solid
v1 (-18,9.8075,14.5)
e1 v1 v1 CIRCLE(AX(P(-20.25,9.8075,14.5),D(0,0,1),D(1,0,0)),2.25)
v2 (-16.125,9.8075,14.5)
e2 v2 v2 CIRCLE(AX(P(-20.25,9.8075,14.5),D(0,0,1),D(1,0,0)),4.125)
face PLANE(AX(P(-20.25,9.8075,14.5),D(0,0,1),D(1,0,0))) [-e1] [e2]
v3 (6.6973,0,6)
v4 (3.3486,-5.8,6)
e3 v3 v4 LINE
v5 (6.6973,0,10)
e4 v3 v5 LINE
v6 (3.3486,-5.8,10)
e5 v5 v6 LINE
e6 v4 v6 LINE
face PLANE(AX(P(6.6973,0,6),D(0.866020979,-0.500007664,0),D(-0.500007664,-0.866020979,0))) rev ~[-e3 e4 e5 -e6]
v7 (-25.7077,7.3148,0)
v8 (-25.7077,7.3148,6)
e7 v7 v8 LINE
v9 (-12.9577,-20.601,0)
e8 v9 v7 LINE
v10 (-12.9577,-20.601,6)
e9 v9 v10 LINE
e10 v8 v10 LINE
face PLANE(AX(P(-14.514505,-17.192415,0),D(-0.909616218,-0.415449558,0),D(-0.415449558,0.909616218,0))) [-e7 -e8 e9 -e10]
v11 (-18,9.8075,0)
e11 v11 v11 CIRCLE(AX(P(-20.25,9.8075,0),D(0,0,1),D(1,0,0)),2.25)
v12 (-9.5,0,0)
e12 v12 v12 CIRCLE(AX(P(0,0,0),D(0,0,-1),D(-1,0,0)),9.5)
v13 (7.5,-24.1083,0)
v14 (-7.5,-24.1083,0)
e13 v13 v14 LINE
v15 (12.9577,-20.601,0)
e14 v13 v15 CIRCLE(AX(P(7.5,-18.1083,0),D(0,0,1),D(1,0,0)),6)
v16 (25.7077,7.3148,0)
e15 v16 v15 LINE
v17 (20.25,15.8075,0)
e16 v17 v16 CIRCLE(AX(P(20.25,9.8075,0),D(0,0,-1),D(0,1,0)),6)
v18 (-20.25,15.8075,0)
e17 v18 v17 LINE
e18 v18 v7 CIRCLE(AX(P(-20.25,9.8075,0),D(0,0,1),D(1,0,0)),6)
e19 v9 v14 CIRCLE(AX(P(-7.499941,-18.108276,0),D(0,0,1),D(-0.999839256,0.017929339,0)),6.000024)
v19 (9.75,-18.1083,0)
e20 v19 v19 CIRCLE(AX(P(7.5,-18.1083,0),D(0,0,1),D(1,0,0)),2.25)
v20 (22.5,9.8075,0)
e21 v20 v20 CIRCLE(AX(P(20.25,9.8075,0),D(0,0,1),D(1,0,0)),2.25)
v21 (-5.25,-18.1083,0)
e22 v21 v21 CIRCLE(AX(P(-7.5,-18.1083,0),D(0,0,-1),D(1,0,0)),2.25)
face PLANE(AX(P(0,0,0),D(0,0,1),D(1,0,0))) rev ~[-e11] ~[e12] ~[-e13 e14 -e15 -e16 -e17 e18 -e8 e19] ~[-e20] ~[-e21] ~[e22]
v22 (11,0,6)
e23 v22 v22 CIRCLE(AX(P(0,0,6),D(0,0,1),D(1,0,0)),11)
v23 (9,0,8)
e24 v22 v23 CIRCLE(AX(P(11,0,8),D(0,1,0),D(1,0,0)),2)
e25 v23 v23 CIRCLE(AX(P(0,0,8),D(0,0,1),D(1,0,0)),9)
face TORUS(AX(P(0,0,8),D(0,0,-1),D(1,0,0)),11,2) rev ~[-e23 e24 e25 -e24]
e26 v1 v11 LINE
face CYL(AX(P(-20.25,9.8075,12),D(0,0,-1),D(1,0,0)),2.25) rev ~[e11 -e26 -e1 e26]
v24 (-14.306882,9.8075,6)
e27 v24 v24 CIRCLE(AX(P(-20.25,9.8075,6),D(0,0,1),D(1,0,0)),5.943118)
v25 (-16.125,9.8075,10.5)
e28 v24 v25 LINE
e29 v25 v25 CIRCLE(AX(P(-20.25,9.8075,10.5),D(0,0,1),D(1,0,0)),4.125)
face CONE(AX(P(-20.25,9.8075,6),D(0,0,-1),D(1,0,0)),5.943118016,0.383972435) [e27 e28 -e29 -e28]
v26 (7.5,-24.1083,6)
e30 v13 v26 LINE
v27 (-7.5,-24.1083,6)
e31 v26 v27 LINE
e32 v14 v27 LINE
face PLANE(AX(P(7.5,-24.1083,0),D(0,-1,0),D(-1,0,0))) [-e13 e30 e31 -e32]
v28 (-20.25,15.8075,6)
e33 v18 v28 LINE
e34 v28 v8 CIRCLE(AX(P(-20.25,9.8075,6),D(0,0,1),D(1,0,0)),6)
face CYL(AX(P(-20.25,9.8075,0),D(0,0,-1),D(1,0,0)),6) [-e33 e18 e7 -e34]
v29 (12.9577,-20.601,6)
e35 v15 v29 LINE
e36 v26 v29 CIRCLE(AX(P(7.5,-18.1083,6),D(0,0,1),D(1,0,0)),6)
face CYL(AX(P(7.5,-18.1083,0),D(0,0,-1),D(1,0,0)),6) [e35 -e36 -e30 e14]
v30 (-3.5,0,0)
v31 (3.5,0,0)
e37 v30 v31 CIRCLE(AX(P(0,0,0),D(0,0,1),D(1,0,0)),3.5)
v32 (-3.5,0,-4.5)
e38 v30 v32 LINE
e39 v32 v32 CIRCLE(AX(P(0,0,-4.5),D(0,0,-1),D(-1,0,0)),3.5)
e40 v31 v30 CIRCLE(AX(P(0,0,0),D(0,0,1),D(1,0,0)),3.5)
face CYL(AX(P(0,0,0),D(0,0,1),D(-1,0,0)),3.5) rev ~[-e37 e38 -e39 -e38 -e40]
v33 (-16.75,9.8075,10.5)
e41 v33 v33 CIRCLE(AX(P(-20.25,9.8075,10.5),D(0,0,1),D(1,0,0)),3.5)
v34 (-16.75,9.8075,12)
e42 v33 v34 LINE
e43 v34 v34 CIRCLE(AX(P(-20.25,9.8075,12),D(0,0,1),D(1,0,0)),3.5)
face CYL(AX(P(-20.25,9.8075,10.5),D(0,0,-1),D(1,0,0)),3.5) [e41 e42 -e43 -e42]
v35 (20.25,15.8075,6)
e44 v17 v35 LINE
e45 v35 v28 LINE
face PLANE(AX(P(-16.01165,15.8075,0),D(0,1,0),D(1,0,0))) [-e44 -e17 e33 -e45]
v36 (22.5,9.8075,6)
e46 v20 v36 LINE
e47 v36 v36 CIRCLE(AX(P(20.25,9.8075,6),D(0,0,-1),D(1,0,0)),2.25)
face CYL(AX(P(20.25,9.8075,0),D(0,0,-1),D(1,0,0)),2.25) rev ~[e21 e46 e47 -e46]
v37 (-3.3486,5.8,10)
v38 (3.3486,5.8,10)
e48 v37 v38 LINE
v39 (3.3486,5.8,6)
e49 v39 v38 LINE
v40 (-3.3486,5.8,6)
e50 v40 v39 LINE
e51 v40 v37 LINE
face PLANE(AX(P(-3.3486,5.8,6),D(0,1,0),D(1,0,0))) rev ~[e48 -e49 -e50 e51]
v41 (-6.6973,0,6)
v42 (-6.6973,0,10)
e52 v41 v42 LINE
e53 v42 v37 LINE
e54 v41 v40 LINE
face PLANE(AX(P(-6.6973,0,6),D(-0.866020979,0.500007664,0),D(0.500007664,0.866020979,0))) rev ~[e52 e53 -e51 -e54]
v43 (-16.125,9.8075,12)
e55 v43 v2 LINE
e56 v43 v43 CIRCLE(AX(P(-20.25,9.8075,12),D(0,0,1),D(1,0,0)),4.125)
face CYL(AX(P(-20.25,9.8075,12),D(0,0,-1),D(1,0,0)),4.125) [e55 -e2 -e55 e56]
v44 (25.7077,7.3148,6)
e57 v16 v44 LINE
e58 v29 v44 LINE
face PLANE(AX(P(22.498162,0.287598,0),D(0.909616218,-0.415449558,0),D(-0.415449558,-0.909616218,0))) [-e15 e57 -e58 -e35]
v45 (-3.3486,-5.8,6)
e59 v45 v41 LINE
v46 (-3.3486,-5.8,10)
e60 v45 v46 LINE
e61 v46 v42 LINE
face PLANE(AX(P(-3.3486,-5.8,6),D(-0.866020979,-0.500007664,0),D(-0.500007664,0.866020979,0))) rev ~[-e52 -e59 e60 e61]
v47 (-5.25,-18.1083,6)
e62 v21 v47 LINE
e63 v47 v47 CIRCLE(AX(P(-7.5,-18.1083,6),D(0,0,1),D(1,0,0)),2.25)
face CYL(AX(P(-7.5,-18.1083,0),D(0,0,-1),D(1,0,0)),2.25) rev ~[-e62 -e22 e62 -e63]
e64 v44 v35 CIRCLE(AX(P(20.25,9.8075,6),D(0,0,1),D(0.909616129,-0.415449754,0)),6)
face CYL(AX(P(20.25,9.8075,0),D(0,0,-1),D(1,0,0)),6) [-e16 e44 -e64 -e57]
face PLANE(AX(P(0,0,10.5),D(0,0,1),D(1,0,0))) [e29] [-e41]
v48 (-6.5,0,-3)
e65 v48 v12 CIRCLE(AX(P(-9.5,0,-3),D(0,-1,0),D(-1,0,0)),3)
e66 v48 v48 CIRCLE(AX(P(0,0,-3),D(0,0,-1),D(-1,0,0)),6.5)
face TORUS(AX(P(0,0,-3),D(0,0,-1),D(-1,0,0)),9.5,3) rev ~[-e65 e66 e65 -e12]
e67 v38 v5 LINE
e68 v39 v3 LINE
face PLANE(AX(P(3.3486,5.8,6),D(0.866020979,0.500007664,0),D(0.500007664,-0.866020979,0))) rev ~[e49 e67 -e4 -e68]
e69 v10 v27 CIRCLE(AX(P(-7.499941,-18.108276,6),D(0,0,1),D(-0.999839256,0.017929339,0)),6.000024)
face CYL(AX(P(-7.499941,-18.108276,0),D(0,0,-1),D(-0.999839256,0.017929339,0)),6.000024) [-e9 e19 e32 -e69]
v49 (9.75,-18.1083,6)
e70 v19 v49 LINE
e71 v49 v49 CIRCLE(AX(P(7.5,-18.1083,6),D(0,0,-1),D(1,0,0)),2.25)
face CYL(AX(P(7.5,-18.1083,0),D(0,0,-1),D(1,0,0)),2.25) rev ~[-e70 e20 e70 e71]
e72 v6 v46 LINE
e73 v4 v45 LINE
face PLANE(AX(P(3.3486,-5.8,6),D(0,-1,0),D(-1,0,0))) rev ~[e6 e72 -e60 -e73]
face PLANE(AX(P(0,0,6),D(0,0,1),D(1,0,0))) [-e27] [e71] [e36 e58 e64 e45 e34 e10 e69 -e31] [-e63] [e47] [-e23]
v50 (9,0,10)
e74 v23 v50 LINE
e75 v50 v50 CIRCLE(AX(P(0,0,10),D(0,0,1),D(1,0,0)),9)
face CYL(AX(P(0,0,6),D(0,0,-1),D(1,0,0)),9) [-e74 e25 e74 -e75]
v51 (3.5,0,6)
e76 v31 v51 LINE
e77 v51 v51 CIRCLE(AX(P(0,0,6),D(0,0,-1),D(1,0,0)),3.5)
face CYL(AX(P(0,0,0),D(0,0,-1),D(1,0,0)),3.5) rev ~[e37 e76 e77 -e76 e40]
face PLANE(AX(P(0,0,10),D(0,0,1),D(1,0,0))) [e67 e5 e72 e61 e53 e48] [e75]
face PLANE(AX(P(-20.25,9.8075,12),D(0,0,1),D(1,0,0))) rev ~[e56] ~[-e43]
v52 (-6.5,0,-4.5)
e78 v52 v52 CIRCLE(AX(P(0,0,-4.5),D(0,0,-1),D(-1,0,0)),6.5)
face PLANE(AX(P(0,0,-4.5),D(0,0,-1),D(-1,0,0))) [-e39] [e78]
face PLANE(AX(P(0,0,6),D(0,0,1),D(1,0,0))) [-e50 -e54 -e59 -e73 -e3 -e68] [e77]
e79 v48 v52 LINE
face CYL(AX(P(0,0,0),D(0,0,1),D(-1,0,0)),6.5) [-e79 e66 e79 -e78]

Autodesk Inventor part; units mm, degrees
ref_plane "YZ Plane" through (0, 0, 0) normal (1, 0, 0) x (0, 1, 0)
ref_plane "XZ Plane" through (0, 0, 0) normal (0, 1, 0) x (-1, 0, 0)
ref_plane "XY Plane" through (0, 0, 0) normal (0, 0, 1) x (1, 0, 0)
sketch "Sketch1" plane through (0, 0, 0) normal (0, 0, 1) x (1, 0, 0)
  circle A0 centre (0, 0) radius 3.5
  line L0 (0, 0) -> (7.5, 0)
  line L1 (0, 0) -> (-7.5, 0)
  line L2 (7.5, 0) -> (7.5, -18.1083)
  line L3 (-7.5, 0) -> (-7.5, -18.1083)
  circle A1 centre (7.5, -18.1083) radius 2.25
  circle A2 centre (-7.5, -18.1083) radius 2.25
  circle A3 centre (0, 0) radius 22.5
  line L4 (0, 0) -> (20.25, 0)
  line L5 (20.25, 0) -> (20.25, 9.8075)
  line L6 (0, 0) -> (-20.25, 0)
  line L7 (-20.25, 0) -> (-20.25, 9.8075)
  circle A4 centre (20.25, 9.8075) radius 2.25
  circle A5 centre (-20.25, 9.8075) radius 2.25
  line L8 (-20.25, 9.8075) -> (20.25, 9.8075)
  line L9 (20.25, 9.8075) -> (7.5, -18.1083)
  line L10 (7.5, -18.1083) -> (-7.5, -18.1083)
  line L11 (-7.5, -18.1083) -> (-20.25, 9.8075)
  line L12 (-20.25, 15.8075) -> (20.25, 15.8075)
  line L13 (25.7077, 7.3148) -> (12.9577, -20.601)
  line L14 (7.5, -24.1083) -> (-7.5, -24.1083)
  line L15 (-12.9577, -20.601) -> (-25.7077, 7.3148)
  circle A6 centre (-20.25, 9.8075) radius 6
  circle A7 centre (20.25, 9.8075) radius 6
  circle A8 centre (7.5, -18.1083) radius 6
  arc A9 (-13.499, -18.0007) -> (-7.5, -24.1083) centre (-7.5, -18.1083) ccw
  arc A10 (-7.5, -18.1083) -> (7.5, -18.1083) centre (0, 0) ccw
  dimension "d0" = 7
  dimension "d1" = 7.5
  dimension "d2" = 7.5
  dimension "d4" = 4.5
  dimension "d5" = 4.5
  dimension "d6" = 45
  dimension "d7" = 20.25
  dimension "d8" = 20.25
  dimension "d9" = 4.5
  dimension "d10" = 4.5
  dimension "d11" = 6
  dimension "d27" = 12
  dimension "d28" = 6
  dimension "d29" = 12
  dimension "d30" = 12
extrude "Extrusion1" add sketch "Sketch1" along normal blind 6 contours L0 L2 A8 L10 A2 L3 L1 A0 | A0 L1 L6 L11 A6 L8 A7 L9 L4 L0 | L4 L9 A8 L2 | L3 A2 L11 L6 | A8 L9 A1 L2 | L2 A1 L10 A8 | L9 A7 L5 L4 | L4 L5 A7 A3 L13 A8 L9 | L11 A2 A10 A8 A3 L15 A6 L7 L6 | L6 L7 A6 L11 | A8 A3 A10 A1 L9 | A8 A10 A2 L10 | L10 A1 A10 A8 | A7 L8 A4 L9 | L9 A4 L5 A7 | A6 L7 A5 L11 | L11 A5 L8 A6 | A8 A3 | A3 L13 A8 | L5 A4 A3 A7 | A7 A3 A4 L8 | L8 A6 A3 L12 A7 | A6 A3 A5 L7 | L8 A5 A3 A6 | A8 L14 A9 A3 | A7 L13 A3 | A3 A4 A7 | A3 L12 A7 | A6 A3 A5 | A3 L15 A6 | A6 L12 A3 | A9 L15 A3
sketch "Sketch2" plane through (0, 0, 0) normal (0, 0, -1) x (-1, 0, 0)
  circle A0 centre (0, 0) radius 3.5 projected
  circle A1 centre (0, 0) radius 6.5
  circle A2 centre (0, 0) radius 3.5
  dimension "d14" = 13
extrude "Extrusion2" add sketch "Sketch2" along normal blind 4.5
fillet "Fillet1" radius 3 1 edges at (6.5, 0, 0)
sketch "Sketch3" plane through (0, 0, 6) normal (0, 0, 1) x (1, 0, 0)
  circle A0 centre (-20.25, 9.8075) radius 2.25 projected
  arc A1 (-20.25, 15.8075) -> (-25.7077, 7.3148) centre (-20.25, 9.8075) ccw projected
  circle A2 centre (-20.25, 9.8075) radius 4.125
  circle A3 centre (-20.25, 9.8075) radius 2.25
  dimension "d18" = 8.25
  dimension "d36" = 4.5
extrude "Extrusion3" add sketch "Sketch3" along normal blind 4.5
sketch "Sketch4" plane through (-20.25, 9.8075, 10.5) normal (0, 0, 1) x (1, 0, 0)
  circle A0 centre (0, 0) radius 2.25 projected
  circle A1 centre (0, 0) radius 4.125 projected
  circle A2 centre (0, 0) radius 3.5
  circle A3 centre (0, 0) radius 2.25
  point P0 (20.25, -9.8075)
  dimension "d21" = 7
extrude "Extrusion4" add sketch "Sketch4" along normal blind 1.5 contours A2
sketch "Sketch5" plane through (-20.25, 9.8075, 12) normal (0, 0, 1) x (1, 0, 0)
  circle A0 centre (0, 0) radius 2.25 projected
  circle A1 centre (0, 0) radius 3.5 projected
  circle A2 centre (0, 0) radius 4.125
  circle A3 centre (0, 0) radius 2.25
  point P0 (20.25, -9.8075)
  dimension "d24" = 8.25
extrude "Extrusion5" add sketch "Sketch5" along normal blind 2.5 contours A1 | A2
sketch "Sketch6" plane through (0, 0, 6) normal (0, 0, 1) x (1, 0, 0)
  circle A0 centre (0, 0) radius 3.5 projected
  line L0 (6.6973, 0) -> (3.3486, -5.8)
  line L1 (3.3486, -5.8) -> (-3.3486, -5.8)
  line L2 (-3.3486, -5.8) -> (-6.6973, 0)
  line L3 (-6.6973, 0) -> (-3.3486, 5.8)
  line L4 (-3.3486, 5.8) -> (3.3486, 5.8)
  line L5 (3.3486, 5.8) -> (6.6973, 0)
  circle A1 centre (0, 0) radius 9
  dimension "d31" = 11.6
  dimension "d32" = 18
extrude "Extrusion6" add sketch "Sketch6" along normal blind 4 contours A1
fillet "Fillet2" radius 2 1 edges at (-9, 0, 6)
draft "FaceDraft1" angle 22 pull direction (0, 0, 1) faces at (-16.1384, 9.4756, 9) fixed edges at (-24.375, 9.8075, 10.5)
properties part number "hexagon_1"
